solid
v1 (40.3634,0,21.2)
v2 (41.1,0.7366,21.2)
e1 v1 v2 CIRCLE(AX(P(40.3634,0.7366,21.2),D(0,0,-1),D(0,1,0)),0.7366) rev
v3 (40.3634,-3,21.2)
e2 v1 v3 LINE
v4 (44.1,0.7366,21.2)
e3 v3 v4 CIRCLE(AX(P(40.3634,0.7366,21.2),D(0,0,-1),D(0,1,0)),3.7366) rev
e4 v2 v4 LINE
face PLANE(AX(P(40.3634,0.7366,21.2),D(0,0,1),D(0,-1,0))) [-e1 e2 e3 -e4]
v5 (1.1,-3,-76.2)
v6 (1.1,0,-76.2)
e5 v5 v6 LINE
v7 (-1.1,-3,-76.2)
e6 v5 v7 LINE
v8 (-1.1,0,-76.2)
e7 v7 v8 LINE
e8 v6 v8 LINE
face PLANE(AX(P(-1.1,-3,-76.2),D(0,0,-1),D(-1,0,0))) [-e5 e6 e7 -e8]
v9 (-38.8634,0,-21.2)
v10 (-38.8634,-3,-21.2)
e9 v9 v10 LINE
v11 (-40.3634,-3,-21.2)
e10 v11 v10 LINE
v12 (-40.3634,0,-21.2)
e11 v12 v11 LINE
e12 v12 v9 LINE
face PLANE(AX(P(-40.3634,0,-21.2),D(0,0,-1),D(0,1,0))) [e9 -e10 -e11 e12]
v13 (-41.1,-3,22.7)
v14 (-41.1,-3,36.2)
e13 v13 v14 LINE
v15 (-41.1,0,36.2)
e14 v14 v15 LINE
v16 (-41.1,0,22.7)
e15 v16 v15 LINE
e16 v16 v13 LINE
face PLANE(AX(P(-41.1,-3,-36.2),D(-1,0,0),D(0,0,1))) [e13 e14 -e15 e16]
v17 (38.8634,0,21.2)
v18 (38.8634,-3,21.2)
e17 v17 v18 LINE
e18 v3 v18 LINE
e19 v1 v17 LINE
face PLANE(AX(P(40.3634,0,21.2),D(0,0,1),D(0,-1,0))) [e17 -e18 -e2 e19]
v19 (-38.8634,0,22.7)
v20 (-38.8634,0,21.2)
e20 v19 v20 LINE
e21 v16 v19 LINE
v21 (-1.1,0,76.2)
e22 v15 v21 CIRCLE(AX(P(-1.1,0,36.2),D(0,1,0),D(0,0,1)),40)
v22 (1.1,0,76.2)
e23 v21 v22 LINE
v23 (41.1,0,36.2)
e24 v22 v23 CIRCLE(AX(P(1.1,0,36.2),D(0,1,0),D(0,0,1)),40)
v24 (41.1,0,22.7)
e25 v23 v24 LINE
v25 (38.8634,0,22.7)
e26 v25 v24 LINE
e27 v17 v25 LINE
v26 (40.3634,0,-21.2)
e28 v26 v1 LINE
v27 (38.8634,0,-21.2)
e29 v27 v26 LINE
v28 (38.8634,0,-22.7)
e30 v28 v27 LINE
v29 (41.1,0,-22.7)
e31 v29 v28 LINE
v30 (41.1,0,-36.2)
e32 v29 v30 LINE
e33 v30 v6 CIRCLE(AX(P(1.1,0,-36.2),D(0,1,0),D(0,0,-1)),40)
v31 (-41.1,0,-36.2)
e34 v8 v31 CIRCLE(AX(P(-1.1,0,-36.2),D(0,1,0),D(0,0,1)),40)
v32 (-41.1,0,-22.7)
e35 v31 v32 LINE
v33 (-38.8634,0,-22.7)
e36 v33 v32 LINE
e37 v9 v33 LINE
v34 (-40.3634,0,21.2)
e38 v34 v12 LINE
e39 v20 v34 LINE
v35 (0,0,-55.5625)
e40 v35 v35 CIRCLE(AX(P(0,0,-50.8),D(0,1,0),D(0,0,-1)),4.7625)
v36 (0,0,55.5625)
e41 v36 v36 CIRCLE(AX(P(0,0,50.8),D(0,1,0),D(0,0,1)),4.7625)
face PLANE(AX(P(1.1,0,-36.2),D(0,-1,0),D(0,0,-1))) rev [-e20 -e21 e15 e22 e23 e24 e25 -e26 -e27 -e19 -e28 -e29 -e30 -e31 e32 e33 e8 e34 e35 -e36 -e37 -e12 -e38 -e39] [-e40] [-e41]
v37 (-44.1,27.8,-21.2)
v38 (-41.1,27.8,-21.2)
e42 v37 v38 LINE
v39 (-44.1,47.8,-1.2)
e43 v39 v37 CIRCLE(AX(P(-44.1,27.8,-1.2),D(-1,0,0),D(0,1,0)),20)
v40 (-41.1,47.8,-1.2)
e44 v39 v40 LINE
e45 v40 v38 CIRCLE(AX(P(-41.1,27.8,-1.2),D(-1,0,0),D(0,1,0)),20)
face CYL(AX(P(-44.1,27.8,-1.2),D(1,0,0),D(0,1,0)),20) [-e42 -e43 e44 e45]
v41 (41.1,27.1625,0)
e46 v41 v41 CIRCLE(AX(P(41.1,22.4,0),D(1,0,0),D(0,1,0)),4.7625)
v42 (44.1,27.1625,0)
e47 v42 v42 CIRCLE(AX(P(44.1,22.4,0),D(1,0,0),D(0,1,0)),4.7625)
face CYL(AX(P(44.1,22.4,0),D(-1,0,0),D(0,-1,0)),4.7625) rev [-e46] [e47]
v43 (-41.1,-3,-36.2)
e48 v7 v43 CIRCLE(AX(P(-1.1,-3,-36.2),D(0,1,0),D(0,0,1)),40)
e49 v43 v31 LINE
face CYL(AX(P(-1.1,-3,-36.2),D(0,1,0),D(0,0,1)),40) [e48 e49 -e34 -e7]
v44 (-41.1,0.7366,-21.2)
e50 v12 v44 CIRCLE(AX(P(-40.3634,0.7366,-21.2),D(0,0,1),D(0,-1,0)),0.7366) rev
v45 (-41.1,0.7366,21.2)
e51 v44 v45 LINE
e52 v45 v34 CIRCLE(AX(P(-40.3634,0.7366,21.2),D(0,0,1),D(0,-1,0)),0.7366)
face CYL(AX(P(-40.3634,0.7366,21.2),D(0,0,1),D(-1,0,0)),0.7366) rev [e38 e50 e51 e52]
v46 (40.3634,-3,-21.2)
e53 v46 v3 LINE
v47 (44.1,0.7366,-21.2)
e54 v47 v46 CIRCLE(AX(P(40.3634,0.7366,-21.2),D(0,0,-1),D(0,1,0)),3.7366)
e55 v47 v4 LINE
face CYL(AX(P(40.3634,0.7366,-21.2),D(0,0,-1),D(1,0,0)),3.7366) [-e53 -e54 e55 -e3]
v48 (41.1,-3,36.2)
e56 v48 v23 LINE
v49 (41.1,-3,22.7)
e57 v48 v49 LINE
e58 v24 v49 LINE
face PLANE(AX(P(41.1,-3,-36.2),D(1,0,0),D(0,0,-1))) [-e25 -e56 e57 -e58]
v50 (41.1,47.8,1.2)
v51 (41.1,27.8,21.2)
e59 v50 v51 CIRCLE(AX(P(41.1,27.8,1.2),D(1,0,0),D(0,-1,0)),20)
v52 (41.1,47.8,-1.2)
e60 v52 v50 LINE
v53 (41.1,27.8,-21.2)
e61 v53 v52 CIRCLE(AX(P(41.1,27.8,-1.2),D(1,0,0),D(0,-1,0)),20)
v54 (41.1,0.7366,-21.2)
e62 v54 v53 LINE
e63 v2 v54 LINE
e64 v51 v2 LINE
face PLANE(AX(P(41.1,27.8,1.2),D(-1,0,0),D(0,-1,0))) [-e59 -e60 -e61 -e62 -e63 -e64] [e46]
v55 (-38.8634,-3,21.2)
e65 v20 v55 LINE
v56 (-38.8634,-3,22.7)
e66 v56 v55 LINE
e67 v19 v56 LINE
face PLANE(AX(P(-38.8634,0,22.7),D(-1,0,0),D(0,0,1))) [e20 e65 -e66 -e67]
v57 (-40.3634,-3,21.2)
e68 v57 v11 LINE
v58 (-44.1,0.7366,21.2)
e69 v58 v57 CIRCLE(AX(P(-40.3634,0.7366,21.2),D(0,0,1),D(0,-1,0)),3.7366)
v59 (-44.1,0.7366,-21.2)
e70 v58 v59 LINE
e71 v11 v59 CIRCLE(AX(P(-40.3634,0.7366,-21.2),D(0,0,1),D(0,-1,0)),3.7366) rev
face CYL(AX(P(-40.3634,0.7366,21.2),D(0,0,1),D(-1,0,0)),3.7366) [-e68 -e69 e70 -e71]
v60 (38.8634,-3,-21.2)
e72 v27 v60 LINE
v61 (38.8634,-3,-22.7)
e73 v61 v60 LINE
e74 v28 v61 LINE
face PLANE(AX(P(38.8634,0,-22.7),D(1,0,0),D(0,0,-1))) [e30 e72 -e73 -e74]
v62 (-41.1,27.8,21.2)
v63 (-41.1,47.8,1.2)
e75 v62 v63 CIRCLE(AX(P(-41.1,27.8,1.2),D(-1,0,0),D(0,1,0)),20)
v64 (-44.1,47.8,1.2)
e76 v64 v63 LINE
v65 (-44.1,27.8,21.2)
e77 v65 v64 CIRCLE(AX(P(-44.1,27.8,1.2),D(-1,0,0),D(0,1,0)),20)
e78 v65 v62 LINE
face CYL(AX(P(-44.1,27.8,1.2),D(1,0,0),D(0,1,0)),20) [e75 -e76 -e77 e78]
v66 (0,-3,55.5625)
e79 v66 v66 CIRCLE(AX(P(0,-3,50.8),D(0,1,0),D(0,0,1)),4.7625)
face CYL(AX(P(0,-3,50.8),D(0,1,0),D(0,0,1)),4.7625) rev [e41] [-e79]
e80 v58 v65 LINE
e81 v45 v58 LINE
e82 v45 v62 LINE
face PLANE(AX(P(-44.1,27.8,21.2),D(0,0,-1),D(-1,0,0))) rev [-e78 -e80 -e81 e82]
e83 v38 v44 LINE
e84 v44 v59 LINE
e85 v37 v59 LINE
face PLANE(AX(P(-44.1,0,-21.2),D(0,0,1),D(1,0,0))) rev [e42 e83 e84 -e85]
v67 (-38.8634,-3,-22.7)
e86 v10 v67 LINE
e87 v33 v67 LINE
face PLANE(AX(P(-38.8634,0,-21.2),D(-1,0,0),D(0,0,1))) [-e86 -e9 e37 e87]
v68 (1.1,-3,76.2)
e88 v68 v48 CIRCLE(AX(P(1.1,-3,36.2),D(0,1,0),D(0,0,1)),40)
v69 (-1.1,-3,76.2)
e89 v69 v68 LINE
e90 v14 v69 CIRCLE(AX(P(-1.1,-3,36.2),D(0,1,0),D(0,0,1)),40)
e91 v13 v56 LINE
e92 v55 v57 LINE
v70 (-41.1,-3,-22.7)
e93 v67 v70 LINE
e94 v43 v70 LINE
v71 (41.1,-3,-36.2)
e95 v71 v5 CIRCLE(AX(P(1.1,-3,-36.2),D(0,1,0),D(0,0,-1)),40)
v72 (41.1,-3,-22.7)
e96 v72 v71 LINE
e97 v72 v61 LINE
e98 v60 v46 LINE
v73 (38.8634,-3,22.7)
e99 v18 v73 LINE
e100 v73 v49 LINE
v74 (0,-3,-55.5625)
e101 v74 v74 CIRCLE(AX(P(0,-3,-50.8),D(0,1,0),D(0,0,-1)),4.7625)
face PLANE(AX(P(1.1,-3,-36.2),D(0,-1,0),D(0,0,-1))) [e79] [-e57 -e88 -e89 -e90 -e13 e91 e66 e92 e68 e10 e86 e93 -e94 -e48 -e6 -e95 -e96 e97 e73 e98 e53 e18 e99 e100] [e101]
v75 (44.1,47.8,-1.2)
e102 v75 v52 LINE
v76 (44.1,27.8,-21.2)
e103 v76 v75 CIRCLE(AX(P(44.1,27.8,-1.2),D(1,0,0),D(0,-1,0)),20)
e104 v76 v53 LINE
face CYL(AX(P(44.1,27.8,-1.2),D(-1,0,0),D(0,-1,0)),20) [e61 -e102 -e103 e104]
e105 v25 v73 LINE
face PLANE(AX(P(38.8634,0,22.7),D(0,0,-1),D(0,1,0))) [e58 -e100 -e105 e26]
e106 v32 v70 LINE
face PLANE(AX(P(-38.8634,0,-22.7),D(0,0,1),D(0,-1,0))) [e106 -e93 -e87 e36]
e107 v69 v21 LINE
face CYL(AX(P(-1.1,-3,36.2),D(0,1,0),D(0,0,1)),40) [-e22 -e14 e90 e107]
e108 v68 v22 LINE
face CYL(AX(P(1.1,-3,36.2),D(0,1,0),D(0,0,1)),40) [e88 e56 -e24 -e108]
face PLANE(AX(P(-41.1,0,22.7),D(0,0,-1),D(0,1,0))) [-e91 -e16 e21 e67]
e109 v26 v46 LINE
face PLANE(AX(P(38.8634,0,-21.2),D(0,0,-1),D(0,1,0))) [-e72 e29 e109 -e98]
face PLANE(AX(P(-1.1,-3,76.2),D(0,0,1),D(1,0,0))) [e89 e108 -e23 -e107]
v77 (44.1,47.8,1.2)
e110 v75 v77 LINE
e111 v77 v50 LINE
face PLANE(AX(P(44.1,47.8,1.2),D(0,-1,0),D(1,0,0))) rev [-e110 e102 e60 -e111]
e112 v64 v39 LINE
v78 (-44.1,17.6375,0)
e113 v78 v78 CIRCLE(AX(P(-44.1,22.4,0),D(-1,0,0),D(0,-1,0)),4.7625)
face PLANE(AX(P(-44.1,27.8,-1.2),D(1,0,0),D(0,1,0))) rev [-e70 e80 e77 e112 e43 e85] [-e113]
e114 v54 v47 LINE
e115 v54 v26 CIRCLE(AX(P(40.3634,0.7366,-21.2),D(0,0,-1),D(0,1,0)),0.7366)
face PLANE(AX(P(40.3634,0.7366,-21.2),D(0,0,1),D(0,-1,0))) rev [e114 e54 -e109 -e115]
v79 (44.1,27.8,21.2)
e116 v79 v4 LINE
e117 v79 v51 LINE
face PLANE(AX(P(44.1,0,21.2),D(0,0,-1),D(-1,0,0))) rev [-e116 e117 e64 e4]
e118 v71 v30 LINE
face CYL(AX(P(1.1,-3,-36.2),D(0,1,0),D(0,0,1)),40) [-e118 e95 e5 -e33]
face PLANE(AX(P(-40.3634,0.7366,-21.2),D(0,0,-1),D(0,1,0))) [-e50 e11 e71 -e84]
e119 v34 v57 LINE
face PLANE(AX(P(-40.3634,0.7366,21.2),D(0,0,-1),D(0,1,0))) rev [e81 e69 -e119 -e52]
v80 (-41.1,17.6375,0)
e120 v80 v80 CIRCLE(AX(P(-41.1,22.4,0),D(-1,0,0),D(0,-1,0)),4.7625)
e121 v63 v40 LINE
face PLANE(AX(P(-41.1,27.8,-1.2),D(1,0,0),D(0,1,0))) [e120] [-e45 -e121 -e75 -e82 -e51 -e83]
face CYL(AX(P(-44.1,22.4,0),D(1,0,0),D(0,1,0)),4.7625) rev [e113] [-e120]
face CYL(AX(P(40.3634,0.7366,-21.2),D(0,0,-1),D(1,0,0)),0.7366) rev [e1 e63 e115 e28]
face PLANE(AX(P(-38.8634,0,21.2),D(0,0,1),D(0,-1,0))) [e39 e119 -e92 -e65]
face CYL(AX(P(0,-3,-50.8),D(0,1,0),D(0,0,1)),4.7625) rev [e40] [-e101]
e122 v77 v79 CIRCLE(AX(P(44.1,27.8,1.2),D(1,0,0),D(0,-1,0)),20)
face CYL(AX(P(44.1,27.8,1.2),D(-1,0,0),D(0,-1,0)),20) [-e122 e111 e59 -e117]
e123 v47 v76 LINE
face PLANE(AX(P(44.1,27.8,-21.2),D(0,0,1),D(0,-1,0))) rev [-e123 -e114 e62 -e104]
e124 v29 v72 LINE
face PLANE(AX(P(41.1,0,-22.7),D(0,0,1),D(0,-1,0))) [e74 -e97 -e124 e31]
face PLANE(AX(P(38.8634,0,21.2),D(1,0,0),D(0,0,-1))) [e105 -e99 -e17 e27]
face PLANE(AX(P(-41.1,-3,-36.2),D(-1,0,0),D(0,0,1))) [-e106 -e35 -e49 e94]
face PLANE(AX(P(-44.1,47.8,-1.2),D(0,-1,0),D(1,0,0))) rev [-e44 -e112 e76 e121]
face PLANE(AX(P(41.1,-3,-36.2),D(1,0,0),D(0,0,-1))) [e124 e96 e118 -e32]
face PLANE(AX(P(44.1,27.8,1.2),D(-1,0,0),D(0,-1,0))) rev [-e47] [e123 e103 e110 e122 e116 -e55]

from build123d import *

# Parameters (mm, degrees)
SKETCH1_R                     = 4.7625
BASE_FLANGE1_DEPTH            = 3
EDGE_FLANGE2_STRIP_W          = 13.4732
EDGE_FLANGE2_STRIP_H          = 3
EDGE_FLANGE2_STRIP_CUT_DEPTH  = 42.4
EDGE_FLANGE2_RELIEF_W         = 14.9732
EDGE_FLANGE2_RELIEF_H         = 1.5
EDGE_FLANGE2_RELIEF_CUT_DEPTH = 3
EDGE_FLANGE2_DEPTH            = 42.4
EDGE_FLANGE2_START            = 3
EDGE_FLANGE2_PROFILE_R        = 4.7625
EDGE_FLANGE2_FLAT_DEPTH       = 3
EDGE_FLANGE3_STRIP_W          = 13.4732
EDGE_FLANGE3_STRIP_H          = 3
EDGE_FLANGE3_STRIP_CUT_DEPTH  = 42.4
EDGE_FLANGE3_RELIEF_W         = 14.9732
EDGE_FLANGE3_RELIEF_H         = 1.5
EDGE_FLANGE3_RELIEF_CUT_DEPTH = 3
EDGE_FLANGE3_DEPTH            = 42.4
EDGE_FLANGE3_START            = 3
EDGE_FLANGE3_PROFILE_R        = 4.7625
EDGE_FLANGE3_FLAT_DEPTH       = 3


# Sheet-metal steps are written as plain solids
with BuildPart() as part:
    # Sketch1 → Base-Flange1 (new body)
    with BuildSketch(Plane(origin=(0, 0, 0), x_dir=(1, 0, 0), z_dir=(0, 1, 0))):
        with BuildLine():
            Line((-1.1, 76.2), (1.1, 76.2))
            ThreePointArc((1.1, 76.2), (29.384271247, 64.484271247), (41.1, 36.2))
            Line((41.1, 36.2), (41.1, -36.2))
            ThreePointArc((41.1, -36.2), (29.384271247, -64.484271247), (1.1, -76.2))
            Line((1.1, -76.2), (-1.1, -76.2))
            ThreePointArc((-1.1, -76.2), (-29.384271247, -64.484271247), (-41.1, -36.2))
            Line((-41.1, -36.2), (-41.1, 36.2))
            ThreePointArc((-41.1, 36.2), (-29.384271247, 64.484271247), (-1.1, 76.2))
        make_face()
        with Locations(Location((0, -50.8, 0), (0, 0, 270))):
            Circle(SKETCH1_R, mode=Mode.SUBTRACT)
        with Locations(Location((0, 50.8, 0), (0, 0, 90))):
            Circle(SKETCH1_R, mode=Mode.SUBTRACT)
    extrude(amount=-BASE_FLANGE1_DEPTH)

    # Edge-Flange2 strip (across the edge) → Edge-Flange2 strip cut (cut)
    with BuildSketch(Plane(origin=(41.1, 0, 21.2), x_dir=(-1, 0, 0), z_dir=(0, 0, -1))):
        with Locations((-6, -1.5)):
            Rectangle(EDGE_FLANGE2_STRIP_W, EDGE_FLANGE2_STRIP_H)
    extrude(amount=EDGE_FLANGE2_STRIP_CUT_DEPTH, mode=Mode.SUBTRACT)

    # Edge-Flange2 relief (on the sheet) → Edge-Flange2 relief cut (cut)
    with BuildSketch(Plane(origin=(40.3634, 0, 21.2), x_dir=(-1, 0, 0), z_dir=(0, 1, 0))):
        with Locations((-5.9866, 0.75)):
            Rectangle(EDGE_FLANGE2_RELIEF_W, EDGE_FLANGE2_RELIEF_H)
        with Locations((-5.9866, -43.15)):
            Rectangle(EDGE_FLANGE2_RELIEF_W, EDGE_FLANGE2_RELIEF_H)
    extrude(amount=-EDGE_FLANGE2_RELIEF_CUT_DEPTH, mode=Mode.SUBTRACT)

    # Edge-Flange2 bend section (across the edge) → Edge-Flange2 (add)
    with BuildSketch(Plane(origin=(41.1, 0, 21.2), x_dir=(-1, 0, 0), z_dir=(0, 0, -1))):
        with BuildLine():
            Line((-3, 0.7366), (0, 0.7366))
            ThreePointArc((0, 0.7366), (0.215745145, 0.215745145), (0.7366, 0))
            Line((0.7366, 0), (0.7366, -3))
            ThreePointArc((0.7366, -3), (-1.905575199, -1.905575199), (-3, 0.7366))
        make_face()
    extrude(amount=EDGE_FLANGE2_DEPTH)

    # Edge-Flange2 profile (on flange) → Edge-Flange2 flat (add)
    with BuildSketch(Plane(origin=(41.1, 0, 0), x_dir=(0, 0, -1), z_dir=(1, 0, 0)).offset(EDGE_FLANGE2_START)):
        with BuildLine():
            Line((-21.2, 27.8), (-21.2, 0.7366))
            Line((-21.2, 0.7366), (21.2, 0.7366))
            Line((21.2, 0.7366), (21.2, 27.8))
            ThreePointArc((21.2, 27.8), (15.342135624, 41.942135624), (1.2, 47.8))
            Line((1.2, 47.8), (-1.2, 47.8))
            ThreePointArc((-1.2, 47.8), (-15.342135624, 41.942135624), (-21.2, 27.8))
        make_face()
        with Locations((0, 22.4)):
            Circle(EDGE_FLANGE2_PROFILE_R, mode=Mode.SUBTRACT)
    extrude(amount=-EDGE_FLANGE2_FLAT_DEPTH)

    # Edge-Flange3 strip (across the edge) → Edge-Flange3 strip cut (cut)
    with BuildSketch(Plane(origin=(-41.1, 0, -21.2), x_dir=(1, 0, 0), z_dir=(0, 0, 1))):
        with Locations((-6, -1.5)):
            Rectangle(EDGE_FLANGE3_STRIP_W, EDGE_FLANGE3_STRIP_H)
    extrude(amount=EDGE_FLANGE3_STRIP_CUT_DEPTH, mode=Mode.SUBTRACT)

    # Edge-Flange3 relief (on the sheet) → Edge-Flange3 relief cut (cut)
    with BuildSketch(Plane(origin=(-40.3634, 0, -21.2), x_dir=(1, 0, 0), z_dir=(0, 1, 0))):
        with Locations((-5.9866, 0.75)):
            Rectangle(EDGE_FLANGE3_RELIEF_W, EDGE_FLANGE3_RELIEF_H)
        with Locations((-5.9866, -43.15)):
            Rectangle(EDGE_FLANGE3_RELIEF_W, EDGE_FLANGE3_RELIEF_H)
    extrude(amount=-EDGE_FLANGE3_RELIEF_CUT_DEPTH, mode=Mode.SUBTRACT)

    # Edge-Flange3 bend section (across the edge) → Edge-Flange3 (add)
    with BuildSketch(Plane(origin=(-41.1, 0, -21.2), x_dir=(1, 0, 0), z_dir=(0, 0, 1))):
        with BuildLine():
            Line((-3, 0.7366), (0, 0.7366))
            ThreePointArc((0, 0.7366), (0.215745145, 0.215745145), (0.7366, 0))
            Line((0.7366, 0), (0.7366, -3))
            ThreePointArc((0.7366, -3), (-1.905575199, -1.905575199), (-3, 0.7366))
        make_face()
    extrude(amount=EDGE_FLANGE3_DEPTH)

    # Edge-Flange3 profile (on flange) → Edge-Flange3 flat (add)
    with BuildSketch(Plane.ZY.offset(41.1).offset(EDGE_FLANGE3_START)):
        with BuildLine():
            Line((-21.2, 27.8), (-21.2, 0.7366))
            Line((-21.2, 0.7366), (21.2, 0.7366))
            Line((21.2, 0.7366), (21.2, 27.8))
            ThreePointArc((21.2, 27.8), (15.342135624, 41.942135624), (1.2, 47.8))
            Line((1.2, 47.8), (-1.2, 47.8))
            ThreePointArc((-1.2, 47.8), (-15.342135624, 41.942135624), (-21.2, 27.8))
        make_face()
        with Locations((0, 22.4)):
            Circle(EDGE_FLANGE3_PROFILE_R, mode=Mode.SUBTRACT)
    extrude(amount=-EDGE_FLANGE3_FLAT_DEPTH)


solid = part.part
